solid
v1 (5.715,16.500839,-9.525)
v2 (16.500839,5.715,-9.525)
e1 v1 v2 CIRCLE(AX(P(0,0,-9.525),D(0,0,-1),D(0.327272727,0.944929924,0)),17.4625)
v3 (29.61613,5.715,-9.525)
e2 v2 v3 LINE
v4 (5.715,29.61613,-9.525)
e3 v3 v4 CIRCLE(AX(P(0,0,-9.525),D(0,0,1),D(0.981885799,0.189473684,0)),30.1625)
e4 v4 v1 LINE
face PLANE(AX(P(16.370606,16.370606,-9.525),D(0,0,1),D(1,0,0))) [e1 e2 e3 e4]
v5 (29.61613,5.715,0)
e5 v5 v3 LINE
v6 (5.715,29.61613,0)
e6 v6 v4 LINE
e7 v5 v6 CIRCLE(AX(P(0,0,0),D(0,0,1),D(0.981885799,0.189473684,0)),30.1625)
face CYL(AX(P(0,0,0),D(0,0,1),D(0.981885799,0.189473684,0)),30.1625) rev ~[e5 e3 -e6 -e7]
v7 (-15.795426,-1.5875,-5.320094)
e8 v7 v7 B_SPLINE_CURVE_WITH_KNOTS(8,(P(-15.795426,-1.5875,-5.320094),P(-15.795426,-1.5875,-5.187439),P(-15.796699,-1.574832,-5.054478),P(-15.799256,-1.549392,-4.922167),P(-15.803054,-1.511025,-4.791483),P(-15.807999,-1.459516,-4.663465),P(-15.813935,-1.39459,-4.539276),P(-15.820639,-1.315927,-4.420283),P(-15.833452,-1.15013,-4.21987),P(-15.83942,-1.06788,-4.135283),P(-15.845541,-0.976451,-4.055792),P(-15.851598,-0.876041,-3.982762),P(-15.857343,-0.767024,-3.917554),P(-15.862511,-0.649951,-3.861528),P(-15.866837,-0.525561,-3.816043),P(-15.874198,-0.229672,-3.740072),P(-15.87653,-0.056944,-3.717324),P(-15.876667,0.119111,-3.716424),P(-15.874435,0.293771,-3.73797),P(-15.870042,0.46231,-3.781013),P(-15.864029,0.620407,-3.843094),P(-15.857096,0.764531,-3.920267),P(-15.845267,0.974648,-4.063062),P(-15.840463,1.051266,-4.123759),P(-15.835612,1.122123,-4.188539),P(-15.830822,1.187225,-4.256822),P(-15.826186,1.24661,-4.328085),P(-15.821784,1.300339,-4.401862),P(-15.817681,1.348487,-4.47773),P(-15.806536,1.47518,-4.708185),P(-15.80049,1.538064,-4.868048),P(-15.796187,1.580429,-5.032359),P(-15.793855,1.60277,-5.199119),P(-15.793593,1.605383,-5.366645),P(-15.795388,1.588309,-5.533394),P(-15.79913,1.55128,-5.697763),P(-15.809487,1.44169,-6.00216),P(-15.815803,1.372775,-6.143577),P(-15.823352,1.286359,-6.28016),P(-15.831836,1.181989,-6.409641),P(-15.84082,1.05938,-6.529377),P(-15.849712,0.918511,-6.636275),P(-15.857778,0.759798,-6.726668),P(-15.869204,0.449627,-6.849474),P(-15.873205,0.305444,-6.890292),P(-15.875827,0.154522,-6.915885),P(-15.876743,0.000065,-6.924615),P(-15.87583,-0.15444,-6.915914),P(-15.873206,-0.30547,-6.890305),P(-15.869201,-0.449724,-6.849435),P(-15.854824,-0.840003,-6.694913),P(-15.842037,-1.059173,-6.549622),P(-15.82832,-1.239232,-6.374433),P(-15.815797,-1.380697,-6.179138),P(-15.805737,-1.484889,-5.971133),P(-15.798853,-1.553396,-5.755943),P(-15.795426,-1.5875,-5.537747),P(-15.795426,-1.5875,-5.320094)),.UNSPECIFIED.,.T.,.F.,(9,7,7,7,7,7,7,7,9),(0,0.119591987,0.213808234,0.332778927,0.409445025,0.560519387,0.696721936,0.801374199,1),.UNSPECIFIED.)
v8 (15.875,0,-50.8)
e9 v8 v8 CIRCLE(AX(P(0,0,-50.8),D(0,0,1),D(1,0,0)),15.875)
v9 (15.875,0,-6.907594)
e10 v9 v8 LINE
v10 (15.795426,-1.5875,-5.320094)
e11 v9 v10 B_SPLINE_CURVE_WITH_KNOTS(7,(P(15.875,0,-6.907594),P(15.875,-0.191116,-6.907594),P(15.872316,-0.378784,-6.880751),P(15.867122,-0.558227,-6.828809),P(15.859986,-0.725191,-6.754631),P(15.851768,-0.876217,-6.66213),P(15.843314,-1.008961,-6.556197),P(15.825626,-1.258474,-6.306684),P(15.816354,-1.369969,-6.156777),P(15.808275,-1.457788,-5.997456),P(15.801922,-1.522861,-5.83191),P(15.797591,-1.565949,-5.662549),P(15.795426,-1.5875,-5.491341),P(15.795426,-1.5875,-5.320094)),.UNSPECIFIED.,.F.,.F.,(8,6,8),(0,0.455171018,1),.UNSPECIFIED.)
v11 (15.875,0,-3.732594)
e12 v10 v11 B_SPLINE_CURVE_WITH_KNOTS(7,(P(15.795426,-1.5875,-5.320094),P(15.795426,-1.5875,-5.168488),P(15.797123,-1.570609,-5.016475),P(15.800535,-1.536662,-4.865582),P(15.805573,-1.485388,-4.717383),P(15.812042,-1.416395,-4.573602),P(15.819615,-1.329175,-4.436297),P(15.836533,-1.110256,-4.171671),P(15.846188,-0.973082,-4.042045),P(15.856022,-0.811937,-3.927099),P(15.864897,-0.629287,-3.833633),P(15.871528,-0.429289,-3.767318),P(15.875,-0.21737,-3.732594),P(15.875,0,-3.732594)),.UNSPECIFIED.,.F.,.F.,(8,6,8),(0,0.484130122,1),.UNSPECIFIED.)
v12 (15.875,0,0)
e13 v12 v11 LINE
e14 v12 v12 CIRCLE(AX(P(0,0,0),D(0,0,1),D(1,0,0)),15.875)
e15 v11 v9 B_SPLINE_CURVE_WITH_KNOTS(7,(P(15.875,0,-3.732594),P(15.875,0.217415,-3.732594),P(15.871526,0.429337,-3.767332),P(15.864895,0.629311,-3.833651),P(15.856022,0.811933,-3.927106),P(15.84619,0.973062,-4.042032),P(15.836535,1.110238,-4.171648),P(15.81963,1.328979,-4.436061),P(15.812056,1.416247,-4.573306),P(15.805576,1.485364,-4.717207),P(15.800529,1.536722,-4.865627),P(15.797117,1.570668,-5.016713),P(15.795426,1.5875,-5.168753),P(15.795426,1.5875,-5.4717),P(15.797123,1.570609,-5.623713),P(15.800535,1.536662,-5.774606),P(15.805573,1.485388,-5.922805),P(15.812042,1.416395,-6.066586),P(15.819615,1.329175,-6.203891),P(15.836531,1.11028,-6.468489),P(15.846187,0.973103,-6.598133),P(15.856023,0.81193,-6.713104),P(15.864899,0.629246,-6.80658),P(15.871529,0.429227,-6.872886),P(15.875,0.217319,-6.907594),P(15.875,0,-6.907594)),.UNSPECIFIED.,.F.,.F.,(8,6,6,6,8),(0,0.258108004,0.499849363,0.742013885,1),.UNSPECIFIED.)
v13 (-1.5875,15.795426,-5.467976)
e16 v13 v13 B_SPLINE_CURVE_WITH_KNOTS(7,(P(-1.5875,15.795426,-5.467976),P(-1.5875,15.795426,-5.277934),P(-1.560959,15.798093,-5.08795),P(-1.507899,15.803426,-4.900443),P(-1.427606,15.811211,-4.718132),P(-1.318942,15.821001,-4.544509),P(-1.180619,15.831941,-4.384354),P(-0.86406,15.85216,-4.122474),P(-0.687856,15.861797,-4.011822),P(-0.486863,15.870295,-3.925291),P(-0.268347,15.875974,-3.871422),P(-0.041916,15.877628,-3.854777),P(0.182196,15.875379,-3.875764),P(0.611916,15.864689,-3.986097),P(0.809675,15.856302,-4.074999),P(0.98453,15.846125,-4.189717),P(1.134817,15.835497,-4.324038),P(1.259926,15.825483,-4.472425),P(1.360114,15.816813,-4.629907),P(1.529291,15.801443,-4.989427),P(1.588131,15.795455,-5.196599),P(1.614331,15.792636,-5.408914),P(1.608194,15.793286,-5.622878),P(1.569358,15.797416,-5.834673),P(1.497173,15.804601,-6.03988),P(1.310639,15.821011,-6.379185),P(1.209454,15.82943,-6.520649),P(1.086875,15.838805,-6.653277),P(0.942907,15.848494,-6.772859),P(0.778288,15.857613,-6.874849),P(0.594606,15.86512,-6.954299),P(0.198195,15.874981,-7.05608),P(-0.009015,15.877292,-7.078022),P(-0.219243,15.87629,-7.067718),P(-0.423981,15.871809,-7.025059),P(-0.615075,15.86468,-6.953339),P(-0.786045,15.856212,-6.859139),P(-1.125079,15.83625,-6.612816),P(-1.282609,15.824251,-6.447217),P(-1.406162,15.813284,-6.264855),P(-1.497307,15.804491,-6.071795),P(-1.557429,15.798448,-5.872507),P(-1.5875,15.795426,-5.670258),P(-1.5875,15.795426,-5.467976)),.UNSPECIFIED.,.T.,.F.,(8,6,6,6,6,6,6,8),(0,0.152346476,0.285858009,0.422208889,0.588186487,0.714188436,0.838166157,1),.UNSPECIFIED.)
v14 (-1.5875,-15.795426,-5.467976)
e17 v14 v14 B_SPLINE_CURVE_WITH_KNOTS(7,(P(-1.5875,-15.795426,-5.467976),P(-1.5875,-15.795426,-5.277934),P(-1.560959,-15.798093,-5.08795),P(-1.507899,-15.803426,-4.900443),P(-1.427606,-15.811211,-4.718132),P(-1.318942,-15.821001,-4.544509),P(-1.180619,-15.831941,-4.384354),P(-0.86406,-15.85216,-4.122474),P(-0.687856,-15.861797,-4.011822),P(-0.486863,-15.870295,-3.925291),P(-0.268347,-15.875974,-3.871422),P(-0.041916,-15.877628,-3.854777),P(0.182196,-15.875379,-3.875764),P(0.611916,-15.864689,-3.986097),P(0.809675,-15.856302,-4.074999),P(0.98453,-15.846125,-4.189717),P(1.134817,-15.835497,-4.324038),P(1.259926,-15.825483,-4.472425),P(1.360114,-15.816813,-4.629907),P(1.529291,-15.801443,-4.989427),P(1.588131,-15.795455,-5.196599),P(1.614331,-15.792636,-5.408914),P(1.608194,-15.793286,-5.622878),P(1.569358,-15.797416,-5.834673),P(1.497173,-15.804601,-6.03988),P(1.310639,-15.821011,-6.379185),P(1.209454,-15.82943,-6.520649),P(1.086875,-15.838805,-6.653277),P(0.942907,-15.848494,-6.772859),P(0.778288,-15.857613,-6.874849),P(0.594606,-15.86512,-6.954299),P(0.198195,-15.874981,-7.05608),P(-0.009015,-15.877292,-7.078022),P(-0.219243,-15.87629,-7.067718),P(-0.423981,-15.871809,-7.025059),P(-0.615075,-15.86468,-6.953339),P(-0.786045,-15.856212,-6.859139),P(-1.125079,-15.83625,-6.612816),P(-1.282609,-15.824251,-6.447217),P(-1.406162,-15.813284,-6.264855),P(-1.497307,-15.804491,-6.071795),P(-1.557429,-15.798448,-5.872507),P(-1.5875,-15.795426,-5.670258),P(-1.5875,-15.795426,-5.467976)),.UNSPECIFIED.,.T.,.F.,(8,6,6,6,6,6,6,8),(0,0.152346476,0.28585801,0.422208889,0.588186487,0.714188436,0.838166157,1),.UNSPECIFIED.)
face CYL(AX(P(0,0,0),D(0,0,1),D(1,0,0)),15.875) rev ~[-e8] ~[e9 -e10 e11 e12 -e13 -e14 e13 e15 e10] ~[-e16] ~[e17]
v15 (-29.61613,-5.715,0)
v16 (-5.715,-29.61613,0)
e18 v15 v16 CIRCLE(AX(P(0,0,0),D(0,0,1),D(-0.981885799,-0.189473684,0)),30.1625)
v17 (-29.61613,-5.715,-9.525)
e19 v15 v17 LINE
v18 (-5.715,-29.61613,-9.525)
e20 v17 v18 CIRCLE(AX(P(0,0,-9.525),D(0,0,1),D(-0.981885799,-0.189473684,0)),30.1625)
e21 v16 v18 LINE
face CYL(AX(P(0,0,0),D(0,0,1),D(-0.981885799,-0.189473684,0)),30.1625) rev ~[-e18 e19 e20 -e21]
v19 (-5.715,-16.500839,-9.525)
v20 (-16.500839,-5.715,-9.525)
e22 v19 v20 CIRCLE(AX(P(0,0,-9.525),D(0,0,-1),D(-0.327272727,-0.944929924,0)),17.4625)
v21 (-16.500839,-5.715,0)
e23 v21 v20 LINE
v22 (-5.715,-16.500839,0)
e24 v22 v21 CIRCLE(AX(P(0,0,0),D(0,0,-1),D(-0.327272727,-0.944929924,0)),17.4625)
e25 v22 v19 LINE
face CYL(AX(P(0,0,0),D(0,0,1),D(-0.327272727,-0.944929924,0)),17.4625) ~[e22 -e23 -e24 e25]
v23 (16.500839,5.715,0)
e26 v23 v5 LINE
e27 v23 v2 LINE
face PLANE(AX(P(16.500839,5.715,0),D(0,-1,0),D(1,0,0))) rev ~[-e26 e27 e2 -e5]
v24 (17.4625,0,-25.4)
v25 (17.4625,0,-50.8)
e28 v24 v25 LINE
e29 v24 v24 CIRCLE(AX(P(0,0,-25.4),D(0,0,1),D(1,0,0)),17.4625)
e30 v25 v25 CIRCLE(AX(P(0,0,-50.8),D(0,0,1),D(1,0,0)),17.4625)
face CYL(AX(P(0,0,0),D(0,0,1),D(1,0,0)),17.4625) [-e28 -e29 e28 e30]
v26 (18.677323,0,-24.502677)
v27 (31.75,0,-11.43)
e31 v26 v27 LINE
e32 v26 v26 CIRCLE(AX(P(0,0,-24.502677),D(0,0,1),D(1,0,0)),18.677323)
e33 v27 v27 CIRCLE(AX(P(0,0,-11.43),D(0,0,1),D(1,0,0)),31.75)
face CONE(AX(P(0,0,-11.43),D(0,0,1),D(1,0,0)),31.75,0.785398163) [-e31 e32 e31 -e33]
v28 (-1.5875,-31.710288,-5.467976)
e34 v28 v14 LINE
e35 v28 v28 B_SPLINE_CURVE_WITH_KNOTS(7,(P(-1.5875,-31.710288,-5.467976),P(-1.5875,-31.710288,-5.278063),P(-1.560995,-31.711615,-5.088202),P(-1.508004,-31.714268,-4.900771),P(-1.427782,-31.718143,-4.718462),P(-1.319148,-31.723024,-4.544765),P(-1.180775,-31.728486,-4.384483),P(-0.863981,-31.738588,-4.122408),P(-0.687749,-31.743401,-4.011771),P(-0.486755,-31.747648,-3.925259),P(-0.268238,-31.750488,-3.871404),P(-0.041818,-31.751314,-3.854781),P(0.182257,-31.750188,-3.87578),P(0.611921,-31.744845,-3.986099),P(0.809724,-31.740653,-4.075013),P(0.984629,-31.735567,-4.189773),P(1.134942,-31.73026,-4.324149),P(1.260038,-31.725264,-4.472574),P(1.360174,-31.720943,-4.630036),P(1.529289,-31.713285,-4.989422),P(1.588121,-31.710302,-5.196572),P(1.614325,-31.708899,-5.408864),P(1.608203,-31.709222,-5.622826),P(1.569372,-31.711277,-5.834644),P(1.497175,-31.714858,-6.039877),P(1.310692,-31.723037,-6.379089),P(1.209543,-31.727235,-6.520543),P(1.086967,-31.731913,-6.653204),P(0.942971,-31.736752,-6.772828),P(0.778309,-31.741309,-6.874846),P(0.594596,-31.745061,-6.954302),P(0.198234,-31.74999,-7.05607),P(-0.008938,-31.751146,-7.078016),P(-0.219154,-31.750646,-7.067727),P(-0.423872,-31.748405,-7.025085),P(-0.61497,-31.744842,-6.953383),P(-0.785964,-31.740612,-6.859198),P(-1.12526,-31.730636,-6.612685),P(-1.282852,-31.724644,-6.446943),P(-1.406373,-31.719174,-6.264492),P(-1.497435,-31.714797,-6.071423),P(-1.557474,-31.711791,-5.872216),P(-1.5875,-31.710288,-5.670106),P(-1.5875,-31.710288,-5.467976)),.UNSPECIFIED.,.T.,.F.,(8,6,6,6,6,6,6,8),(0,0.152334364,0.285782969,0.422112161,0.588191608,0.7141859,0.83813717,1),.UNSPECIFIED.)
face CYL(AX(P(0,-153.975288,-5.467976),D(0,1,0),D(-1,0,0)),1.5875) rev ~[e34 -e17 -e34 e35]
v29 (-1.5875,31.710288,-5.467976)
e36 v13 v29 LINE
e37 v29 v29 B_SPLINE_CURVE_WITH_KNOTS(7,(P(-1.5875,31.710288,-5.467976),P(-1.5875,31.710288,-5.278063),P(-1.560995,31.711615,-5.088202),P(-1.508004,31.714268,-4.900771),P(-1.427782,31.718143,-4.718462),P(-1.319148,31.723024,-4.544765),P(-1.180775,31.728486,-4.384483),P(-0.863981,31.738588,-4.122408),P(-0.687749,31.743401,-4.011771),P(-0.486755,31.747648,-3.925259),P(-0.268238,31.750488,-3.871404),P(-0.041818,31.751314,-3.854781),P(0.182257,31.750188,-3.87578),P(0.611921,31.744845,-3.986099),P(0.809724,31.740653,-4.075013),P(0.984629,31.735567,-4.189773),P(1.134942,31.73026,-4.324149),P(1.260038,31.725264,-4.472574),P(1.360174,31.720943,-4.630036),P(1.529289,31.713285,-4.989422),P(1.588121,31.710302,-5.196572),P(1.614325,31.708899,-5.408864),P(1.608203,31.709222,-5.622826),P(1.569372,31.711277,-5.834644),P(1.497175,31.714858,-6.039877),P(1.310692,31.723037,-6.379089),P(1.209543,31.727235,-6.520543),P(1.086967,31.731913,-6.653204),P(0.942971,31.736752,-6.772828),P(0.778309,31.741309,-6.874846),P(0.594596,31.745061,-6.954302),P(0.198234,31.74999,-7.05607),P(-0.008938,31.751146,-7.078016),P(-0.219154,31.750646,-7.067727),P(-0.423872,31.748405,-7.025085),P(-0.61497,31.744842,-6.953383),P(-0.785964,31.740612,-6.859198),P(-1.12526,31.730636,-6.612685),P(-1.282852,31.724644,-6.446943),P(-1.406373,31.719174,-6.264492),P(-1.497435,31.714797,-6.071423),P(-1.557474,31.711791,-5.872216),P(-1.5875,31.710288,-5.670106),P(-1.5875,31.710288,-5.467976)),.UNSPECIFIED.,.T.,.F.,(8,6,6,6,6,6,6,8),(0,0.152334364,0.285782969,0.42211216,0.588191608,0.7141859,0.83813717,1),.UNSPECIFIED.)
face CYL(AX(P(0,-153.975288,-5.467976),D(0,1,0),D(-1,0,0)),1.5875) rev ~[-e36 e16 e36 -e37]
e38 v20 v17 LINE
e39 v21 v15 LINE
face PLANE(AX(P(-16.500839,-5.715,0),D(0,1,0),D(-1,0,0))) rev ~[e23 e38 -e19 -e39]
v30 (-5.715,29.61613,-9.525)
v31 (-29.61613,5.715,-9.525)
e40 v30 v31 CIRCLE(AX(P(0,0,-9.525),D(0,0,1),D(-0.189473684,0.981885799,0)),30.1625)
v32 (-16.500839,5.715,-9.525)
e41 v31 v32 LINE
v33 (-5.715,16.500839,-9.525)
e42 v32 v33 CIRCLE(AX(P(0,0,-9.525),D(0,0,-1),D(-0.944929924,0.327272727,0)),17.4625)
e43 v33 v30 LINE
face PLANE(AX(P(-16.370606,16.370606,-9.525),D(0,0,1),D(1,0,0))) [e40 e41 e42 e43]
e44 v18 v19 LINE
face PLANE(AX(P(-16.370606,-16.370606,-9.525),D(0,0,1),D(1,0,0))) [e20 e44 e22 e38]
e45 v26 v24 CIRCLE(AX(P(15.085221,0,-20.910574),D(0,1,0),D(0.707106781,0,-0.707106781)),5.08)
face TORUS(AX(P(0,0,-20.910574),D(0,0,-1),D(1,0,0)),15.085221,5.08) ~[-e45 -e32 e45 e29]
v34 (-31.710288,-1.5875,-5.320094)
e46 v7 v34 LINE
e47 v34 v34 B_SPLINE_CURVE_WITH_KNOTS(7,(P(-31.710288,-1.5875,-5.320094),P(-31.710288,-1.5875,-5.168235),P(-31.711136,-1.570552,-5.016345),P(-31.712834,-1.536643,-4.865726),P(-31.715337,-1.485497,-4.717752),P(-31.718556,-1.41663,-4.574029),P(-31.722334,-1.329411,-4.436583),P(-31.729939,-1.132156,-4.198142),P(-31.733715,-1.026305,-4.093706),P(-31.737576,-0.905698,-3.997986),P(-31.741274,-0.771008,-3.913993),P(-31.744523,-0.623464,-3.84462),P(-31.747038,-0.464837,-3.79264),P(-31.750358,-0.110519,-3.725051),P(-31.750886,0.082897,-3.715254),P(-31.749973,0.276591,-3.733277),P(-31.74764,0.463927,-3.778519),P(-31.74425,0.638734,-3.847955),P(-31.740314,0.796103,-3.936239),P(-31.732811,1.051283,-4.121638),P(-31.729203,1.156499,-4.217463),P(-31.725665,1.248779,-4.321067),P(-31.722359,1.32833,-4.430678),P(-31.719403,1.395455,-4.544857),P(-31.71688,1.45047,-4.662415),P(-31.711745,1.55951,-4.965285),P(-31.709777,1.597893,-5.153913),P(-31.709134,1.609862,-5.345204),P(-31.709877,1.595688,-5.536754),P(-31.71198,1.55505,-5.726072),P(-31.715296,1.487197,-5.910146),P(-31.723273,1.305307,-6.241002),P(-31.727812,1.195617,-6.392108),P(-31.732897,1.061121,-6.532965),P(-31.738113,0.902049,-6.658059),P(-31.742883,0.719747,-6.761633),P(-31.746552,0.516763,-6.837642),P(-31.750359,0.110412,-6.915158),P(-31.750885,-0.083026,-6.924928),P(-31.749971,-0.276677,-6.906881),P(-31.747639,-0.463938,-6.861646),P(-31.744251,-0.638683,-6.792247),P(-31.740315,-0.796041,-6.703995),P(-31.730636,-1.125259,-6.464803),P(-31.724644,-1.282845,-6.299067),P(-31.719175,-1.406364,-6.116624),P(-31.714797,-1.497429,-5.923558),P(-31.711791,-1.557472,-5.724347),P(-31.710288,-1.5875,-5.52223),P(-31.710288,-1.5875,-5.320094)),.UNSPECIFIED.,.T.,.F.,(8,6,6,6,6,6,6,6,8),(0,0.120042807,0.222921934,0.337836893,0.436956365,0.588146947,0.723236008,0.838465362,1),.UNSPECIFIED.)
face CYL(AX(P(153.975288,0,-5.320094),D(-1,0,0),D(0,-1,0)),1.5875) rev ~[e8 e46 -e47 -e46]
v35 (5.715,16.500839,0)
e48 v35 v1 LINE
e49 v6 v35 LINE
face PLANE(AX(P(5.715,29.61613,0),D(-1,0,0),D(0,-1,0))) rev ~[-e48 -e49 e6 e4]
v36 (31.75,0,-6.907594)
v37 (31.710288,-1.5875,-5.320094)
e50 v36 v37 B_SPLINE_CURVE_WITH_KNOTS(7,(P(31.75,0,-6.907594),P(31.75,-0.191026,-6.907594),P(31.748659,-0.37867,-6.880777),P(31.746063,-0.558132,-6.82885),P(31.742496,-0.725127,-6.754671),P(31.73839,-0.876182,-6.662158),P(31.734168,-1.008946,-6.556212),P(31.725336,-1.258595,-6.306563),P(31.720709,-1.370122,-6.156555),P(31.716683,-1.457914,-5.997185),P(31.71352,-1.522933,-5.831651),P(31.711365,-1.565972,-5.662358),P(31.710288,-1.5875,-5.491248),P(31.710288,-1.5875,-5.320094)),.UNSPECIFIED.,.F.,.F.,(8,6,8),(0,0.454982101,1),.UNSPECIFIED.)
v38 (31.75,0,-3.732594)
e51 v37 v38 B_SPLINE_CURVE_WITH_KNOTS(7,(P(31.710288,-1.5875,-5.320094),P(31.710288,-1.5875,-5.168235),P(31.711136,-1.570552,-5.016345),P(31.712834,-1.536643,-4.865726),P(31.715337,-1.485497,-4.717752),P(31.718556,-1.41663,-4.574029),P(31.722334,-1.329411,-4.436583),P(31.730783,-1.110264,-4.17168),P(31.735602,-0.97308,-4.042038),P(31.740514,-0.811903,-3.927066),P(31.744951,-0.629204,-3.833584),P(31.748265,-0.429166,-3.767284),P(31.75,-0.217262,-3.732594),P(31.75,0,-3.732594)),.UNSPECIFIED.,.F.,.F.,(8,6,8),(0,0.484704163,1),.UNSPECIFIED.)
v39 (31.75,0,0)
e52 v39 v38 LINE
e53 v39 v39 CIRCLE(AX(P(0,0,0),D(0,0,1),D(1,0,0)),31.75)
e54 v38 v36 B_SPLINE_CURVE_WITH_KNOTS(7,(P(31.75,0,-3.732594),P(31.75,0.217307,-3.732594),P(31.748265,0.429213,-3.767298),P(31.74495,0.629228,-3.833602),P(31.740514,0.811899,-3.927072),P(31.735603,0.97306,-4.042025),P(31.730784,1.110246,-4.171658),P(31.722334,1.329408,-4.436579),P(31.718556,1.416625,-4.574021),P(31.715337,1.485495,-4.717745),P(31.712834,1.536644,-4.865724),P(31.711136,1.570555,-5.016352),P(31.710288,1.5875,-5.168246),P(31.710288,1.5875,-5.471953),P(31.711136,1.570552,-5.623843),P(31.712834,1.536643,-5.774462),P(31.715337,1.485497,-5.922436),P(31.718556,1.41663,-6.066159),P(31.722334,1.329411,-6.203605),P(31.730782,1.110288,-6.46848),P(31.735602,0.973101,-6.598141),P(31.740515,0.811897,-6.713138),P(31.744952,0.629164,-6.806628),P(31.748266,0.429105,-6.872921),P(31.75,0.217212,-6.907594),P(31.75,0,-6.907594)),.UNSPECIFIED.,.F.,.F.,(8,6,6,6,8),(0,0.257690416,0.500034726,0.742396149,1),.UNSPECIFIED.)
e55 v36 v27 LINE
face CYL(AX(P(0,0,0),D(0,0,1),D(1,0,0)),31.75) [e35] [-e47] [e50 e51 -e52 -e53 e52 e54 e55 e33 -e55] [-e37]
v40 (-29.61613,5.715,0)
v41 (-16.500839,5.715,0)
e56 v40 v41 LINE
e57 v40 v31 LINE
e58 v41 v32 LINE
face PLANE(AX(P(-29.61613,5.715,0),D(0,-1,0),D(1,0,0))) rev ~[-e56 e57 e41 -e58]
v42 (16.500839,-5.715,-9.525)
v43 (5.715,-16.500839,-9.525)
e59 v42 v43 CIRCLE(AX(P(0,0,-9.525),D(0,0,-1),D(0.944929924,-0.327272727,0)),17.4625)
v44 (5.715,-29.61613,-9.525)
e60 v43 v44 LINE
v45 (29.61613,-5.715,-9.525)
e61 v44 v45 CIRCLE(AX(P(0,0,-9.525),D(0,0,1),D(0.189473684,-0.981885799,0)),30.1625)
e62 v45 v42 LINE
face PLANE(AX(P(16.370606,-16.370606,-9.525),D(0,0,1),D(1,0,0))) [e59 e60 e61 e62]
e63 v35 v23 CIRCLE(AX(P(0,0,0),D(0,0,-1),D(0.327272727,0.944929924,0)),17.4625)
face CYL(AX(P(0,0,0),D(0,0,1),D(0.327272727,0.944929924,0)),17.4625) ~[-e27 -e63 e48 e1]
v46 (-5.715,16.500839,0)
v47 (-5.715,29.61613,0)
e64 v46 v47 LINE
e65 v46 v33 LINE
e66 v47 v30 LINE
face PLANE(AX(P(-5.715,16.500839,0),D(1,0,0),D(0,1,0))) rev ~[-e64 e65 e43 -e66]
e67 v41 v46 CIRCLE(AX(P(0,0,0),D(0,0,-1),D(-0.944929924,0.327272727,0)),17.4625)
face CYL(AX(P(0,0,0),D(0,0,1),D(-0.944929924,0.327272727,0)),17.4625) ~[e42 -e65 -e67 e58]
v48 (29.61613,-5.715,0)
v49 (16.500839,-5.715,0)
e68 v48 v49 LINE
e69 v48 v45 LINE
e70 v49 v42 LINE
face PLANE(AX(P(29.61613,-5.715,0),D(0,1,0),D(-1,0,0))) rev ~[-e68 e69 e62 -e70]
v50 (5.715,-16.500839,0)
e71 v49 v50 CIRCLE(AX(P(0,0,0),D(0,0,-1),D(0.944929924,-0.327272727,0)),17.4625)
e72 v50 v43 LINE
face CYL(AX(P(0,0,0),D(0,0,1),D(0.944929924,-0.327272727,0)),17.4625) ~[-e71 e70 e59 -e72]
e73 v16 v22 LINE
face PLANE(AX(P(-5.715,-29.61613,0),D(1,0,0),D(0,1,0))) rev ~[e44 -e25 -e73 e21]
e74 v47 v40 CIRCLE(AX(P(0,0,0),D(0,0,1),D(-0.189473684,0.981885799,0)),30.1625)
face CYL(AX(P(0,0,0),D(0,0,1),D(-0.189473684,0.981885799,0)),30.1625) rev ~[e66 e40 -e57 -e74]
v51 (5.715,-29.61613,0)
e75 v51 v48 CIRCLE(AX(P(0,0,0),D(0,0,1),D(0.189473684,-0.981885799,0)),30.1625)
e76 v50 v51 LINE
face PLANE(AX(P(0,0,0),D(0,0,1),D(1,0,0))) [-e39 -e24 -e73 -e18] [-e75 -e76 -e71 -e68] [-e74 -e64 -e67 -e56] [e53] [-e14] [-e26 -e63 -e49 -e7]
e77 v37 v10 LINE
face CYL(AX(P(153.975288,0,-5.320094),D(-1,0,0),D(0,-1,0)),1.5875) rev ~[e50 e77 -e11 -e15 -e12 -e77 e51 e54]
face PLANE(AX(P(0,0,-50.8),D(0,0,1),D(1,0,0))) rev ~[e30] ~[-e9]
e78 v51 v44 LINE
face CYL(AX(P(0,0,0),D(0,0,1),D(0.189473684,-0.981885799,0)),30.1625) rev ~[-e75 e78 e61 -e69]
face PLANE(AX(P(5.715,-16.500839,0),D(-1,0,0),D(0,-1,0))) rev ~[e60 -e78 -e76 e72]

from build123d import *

# Parameters (mm, degrees)
F0_R     = 31.75
F0_R_2   = 17.4625
F1_DEPTH = 25.4
F0_R_3   = 15.875
F2_DEPTH = 50.8
F3_SIZE  = 13.97
F6_DEPTH = 9.525
F10_D    = 3.175
F13_D    = 3.175


# Not quite as in the source:
# - a fillet or chamfer that OpenCascade refuses, or shapes differently, is made with other operations: its cross-section is extruded or revolved along the edge and cut away or added


with BuildPart() as f1:
    # F0 (on Top) → F1 (new body)
    with BuildSketch(Plane.XY):
        Circle(F0_R)
        Circle(F0_R_2, mode=Mode.SUBTRACT)
    extrude(amount=-F1_DEPTH)

    # F0 (on Top) → F2 (join)
    with BuildSketch(Plane.XY):
        Circle(F0_R_2)
        Circle(F0_R_3, mode=Mode.SUBTRACT)
    extrude(amount=-F2_DEPTH)

    # F3
    f3_edges = [f1.edges().sort_by_distance(p)[0] for p in [
        (-31.75, 0, -25.4),
    ]]
    chamfer(f3_edges, length=F3_SIZE)

    # F4: fillet of radius 5.08 on 1 edges, made by hand

    # F4_s1 → F4_t2 (revolve, cut)
    with BuildSketch(Plane.XZ):
        with BuildLine():
            ThreePointArc((18.677323371, -24.502676629), (18.1034449464, -24.9967366519), (17.4625, -25.4))
            Line((17.4625, -25.4), (17.78, -25.4))
            Line((17.78, -25.4), (18.677323371, -24.502676629))
        make_face()
    revolve(axis=Axis((0, 0, -25.4), (0, 0, 1)), mode=Mode.SUBTRACT)

    # F5 (on Top) → F6 (cut)
    with BuildSketch(Plane.XY):
        with BuildLine():
            ThreePointArc((-5.715, 29.6161304233), (-21.3281082875, 21.3281082875), (-29.6161304233, 5.715))
            Line((-29.6161304233, 5.715), (-16.5008388044, 5.715))
            ThreePointArc((-16.5008388044, 5.715), (-12.3478521665, 12.3478521665), (-5.715, 16.5008388044))
            Line((-5.715, 16.5008388044), (-5.715, 29.6161304233))
        make_face()
        with BuildLine():
            ThreePointArc((-29.6161304233, -5.715), (-21.3281082875, -21.3281082875), (-5.715, -29.6161304233))
            Line((-5.715, -29.6161304233), (-5.715, -16.5008388044))
            ThreePointArc((-5.715, -16.5008388044), (-12.3478521665, -12.3478521665), (-16.5008388044, -5.715))
            Line((-16.5008388044, -5.715), (-29.6161304233, -5.715))
        make_face()
        with BuildLine():
            Line((5.715, -16.5008388044), (5.715, -29.6161304233))
            ThreePointArc((5.715, -29.6161304233), (21.3281082875, -21.3281082875), (29.6161304233, -5.715))
            Line((29.6161304233, -5.715), (16.5008388044, -5.715))
            ThreePointArc((16.5008388044, -5.715), (12.3478521665, -12.3478521665), (5.715, -16.5008388044))
        make_face()
        with BuildLine():
            Line((16.5008388044, 5.715), (29.6161304233, 5.715))
            ThreePointArc((29.6161304233, 5.715), (21.3281082875, 21.3281082875), (5.715, 29.6161304233))
            Line((5.715, 29.6161304233), (5.715, 16.5008388044))
            ThreePointArc((5.715, 16.5008388044), (12.3478521665, 12.3478521665), (16.5008388044, 5.715))
        make_face()
    extrude(amount=-F6_DEPTH, mode=Mode.SUBTRACT)

    # F10 (through all)
    with Locations(Plane.XZ.offset(50.8)):
        with Locations((0, -5.4679759778)):
            Hole(F10_D / 2)

    # F13 (through all)
    with Locations(Plane.YZ.offset(50.8)):
        with Locations((0, -5.3200940602)):
            Hole(F13_D / 2)


solid = f1.part
